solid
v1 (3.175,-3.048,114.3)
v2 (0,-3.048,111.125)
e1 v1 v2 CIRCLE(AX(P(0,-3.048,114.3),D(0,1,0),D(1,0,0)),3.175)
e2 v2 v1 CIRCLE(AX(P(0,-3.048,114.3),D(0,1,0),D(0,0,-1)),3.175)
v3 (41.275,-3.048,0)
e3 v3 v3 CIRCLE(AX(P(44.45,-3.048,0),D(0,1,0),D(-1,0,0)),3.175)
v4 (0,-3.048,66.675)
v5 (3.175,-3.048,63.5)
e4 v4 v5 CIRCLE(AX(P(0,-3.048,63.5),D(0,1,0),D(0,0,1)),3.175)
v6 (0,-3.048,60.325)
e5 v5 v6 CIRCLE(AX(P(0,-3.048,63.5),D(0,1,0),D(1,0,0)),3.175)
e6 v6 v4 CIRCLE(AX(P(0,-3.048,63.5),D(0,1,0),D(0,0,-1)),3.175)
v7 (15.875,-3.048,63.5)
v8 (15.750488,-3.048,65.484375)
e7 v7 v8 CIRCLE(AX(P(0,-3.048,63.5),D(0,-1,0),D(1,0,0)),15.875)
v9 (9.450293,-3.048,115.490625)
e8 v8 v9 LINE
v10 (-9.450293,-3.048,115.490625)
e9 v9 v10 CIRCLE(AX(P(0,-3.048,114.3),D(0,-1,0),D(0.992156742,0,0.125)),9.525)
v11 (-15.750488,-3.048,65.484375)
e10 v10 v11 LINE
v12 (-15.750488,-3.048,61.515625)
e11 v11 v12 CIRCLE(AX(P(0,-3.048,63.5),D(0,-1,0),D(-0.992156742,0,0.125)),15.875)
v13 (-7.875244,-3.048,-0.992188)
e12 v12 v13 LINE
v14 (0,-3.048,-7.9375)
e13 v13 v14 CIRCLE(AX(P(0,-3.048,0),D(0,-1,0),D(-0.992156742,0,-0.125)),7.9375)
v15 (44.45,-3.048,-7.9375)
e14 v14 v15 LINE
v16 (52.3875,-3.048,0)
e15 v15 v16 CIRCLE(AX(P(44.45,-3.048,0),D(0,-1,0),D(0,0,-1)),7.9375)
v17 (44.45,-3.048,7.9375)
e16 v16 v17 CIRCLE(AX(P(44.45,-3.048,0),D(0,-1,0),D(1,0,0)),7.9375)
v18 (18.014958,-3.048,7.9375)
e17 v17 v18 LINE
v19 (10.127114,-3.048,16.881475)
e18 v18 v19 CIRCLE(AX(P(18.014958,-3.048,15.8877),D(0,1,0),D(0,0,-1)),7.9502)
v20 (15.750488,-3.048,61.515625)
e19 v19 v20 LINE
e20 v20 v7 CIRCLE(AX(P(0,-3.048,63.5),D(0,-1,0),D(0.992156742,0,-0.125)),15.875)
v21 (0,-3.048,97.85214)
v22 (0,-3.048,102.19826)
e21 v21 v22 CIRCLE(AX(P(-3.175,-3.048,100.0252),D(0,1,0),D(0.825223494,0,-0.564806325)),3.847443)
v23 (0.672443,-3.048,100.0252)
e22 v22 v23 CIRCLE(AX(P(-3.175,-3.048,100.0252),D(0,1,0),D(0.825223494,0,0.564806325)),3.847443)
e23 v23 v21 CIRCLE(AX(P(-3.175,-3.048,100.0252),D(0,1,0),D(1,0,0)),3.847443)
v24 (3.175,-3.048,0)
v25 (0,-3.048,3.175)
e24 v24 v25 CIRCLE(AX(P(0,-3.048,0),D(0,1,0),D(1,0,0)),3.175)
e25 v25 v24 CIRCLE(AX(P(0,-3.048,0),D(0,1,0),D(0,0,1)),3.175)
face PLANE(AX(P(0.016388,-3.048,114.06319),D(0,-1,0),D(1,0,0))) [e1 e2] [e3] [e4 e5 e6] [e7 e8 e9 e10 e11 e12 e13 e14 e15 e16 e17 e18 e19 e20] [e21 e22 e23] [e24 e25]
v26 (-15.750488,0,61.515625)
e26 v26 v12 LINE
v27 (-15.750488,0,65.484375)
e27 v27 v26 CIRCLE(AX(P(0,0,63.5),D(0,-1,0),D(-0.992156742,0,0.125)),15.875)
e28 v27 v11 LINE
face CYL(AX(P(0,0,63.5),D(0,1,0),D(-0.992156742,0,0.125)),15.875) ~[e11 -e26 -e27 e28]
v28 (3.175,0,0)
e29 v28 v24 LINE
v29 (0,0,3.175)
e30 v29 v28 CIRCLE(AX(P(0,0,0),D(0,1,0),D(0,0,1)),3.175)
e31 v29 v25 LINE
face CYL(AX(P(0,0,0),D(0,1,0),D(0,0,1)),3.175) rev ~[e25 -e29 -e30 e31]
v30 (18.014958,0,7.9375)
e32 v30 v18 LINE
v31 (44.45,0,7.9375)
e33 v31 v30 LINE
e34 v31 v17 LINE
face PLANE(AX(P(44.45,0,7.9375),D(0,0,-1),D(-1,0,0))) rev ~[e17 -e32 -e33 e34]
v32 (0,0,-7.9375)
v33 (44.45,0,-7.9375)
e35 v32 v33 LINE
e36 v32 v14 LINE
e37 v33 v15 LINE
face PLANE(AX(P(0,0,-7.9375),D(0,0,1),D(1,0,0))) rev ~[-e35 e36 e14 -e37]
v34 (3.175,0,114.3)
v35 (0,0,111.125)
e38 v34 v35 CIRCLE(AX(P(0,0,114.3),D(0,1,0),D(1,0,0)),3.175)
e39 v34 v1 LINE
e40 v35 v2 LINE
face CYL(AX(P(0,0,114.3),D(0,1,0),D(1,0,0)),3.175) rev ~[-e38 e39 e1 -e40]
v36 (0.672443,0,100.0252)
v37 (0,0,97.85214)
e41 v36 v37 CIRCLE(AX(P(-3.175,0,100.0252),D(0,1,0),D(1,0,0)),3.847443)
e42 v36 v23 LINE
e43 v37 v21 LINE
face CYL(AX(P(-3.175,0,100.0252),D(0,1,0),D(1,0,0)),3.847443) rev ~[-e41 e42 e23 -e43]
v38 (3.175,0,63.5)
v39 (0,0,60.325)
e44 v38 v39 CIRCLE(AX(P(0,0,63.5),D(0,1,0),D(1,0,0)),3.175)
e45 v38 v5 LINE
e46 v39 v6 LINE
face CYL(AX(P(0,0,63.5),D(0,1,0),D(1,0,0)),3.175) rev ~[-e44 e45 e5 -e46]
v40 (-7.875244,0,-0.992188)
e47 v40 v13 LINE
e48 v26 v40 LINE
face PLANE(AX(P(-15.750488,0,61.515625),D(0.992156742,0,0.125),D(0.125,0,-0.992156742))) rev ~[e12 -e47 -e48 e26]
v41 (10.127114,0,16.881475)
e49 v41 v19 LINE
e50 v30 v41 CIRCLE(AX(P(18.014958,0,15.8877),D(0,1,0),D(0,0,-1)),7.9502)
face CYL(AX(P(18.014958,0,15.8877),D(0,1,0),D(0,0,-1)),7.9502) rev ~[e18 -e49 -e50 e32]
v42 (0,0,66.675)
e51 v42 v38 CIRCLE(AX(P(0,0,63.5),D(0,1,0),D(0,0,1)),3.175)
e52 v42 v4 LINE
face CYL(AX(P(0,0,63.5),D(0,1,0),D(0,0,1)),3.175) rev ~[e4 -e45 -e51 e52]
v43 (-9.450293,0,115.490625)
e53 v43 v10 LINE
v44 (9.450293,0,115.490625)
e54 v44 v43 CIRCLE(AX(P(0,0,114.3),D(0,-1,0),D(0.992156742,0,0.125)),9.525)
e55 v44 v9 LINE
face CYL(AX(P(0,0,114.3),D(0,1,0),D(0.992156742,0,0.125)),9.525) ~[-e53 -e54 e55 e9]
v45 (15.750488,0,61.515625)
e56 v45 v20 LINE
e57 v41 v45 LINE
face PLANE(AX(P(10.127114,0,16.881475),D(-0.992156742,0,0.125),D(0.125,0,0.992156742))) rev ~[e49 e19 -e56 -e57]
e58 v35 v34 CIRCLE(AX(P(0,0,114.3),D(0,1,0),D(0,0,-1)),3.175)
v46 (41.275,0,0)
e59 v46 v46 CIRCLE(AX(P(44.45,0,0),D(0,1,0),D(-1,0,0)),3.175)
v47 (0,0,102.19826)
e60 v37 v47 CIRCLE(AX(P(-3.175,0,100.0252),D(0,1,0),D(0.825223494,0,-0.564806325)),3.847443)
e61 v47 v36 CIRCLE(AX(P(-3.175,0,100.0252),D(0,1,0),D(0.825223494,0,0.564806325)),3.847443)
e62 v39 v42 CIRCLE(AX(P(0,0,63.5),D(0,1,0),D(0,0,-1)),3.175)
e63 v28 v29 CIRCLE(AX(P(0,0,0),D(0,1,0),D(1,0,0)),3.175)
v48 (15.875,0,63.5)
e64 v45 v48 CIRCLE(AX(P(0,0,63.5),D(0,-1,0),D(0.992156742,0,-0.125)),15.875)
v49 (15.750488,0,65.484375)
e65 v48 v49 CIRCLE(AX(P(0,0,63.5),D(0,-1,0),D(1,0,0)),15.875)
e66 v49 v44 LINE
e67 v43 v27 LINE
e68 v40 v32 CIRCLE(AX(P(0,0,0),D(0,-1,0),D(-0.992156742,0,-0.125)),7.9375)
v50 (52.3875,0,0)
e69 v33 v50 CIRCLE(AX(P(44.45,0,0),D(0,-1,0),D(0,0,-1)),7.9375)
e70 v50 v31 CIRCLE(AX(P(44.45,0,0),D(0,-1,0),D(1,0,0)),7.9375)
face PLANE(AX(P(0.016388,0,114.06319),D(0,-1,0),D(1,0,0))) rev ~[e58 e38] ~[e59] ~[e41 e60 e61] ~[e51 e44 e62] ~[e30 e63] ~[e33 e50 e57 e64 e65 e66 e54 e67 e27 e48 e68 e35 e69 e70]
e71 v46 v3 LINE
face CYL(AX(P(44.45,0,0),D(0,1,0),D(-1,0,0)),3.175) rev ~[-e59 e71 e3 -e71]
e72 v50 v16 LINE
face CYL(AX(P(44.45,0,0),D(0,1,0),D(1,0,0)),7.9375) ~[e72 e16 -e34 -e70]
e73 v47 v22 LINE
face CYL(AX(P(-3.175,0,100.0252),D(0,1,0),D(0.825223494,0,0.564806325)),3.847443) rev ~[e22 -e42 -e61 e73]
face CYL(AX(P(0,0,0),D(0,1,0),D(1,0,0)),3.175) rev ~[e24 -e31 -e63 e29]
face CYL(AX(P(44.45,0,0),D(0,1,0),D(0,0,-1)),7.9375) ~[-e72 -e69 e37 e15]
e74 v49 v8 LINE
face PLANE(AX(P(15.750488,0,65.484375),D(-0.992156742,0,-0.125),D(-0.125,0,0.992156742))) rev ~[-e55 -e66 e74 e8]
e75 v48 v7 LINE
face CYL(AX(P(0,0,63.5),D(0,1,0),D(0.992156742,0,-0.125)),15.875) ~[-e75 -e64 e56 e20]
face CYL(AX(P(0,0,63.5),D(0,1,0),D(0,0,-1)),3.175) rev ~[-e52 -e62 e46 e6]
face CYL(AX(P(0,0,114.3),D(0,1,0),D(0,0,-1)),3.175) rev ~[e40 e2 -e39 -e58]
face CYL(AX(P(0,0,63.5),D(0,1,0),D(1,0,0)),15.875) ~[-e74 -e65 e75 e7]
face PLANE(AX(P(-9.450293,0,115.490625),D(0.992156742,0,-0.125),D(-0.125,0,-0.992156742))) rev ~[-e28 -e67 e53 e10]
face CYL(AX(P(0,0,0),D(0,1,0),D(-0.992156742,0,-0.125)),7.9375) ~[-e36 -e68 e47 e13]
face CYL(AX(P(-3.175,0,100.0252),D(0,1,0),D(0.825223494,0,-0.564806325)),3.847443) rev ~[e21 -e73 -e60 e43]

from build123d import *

# Parameters (mm, degrees)
F1_DEPTH = 3.048


with BuildPart() as f1:
    # F0 (on Front) → F1 (new body)
    with BuildSketch(Plane.XZ):
        with BuildLine():
            ThreePointArc((9.4502929642, 115.490625), (0, 123.825), (-9.4502929642, 115.490625))
            ThreePointArc((-9.4502929642, 115.490625), (-7.14375, 107.9998046905), (0, 104.775))
            ThreePointArc((0, 104.775), (6.7351920908, 107.5648079092), (9.525, 114.3))
            ThreePointArc((9.525, 114.3), (9.5063048942, 114.896483242), (9.4502929642, 115.490625))
        make_face()
        with BuildLine():
            ThreePointArc((3.175, 114.3), (2.2450640303, 112.0549359697), (0, 111.125))
            ThreePointArc((0, 111.125), (-2.2450640303, 116.5450640303), (3.175, 114.3))
        make_face(mode=Mode.SUBTRACT)
        with BuildLine():
            Line((-9.4502929642, 115.490625), (-15.7504882737, 65.484375))
            ThreePointArc((-15.7504882737, 65.484375), (-10.5003255158, 75.40625), (0, 79.375))
            Line((0, 79.375), (0, 97.8521401046))
            ThreePointArc((0, 97.8521401046), (-7.0224425673, 100.0252), (0, 102.1982598954))
            Line((0, 102.1982598954), (0, 104.775))
            ThreePointArc((0, 104.775), (-7.14375, 107.9998046905), (-9.4502929642, 115.490625))
        make_face()
        with BuildLine():
            Line((0, 97.8521401046), (0, 79.375))
            ThreePointArc((0, 79.375), (10.5003255158, 75.40625), (15.7504882737, 65.484375))
            Line((15.7504882737, 65.484375), (9.4502929642, 115.490625))
            ThreePointArc((9.4502929642, 115.490625), (9.5063048942, 114.896483242), (9.525, 114.3))
            ThreePointArc((9.525, 114.3), (6.7351920908, 107.5648079092), (0, 104.775))
            Line((0, 104.775), (0, 102.1982598954))
            ThreePointArc((0, 102.1982598954), (0.5004893865, 101.1625618944), (0.6724425673, 100.0252))
            ThreePointArc((0.6724425673, 100.0252), (0.5004893865, 98.8878381056), (0, 97.8521401046))
        make_face()
        with BuildLine():
            Line((0, 47.625), (0, 7.9375))
            ThreePointArc((0, 7.9375), (5.6126600757, 5.6126600757), (7.9375, 0))
            Line((7.9375, 0), (36.5125, 0))
            ThreePointArc((36.5125, 0), (38.8373399243, 5.6126600757), (44.45, 7.9375))
            Line((44.45, 7.9375), (18.0149584735, 7.9375))
            ThreePointArc((18.0149584735, 7.9375), (12.0523084735, 10.6291369817), (10.127113946, 16.881475))
            Line((10.127113946, 16.881475), (15.7504882737, 61.515625))
            ThreePointArc((15.7504882737, 61.515625), (10.5003255158, 51.59375), (0, 47.625))
        make_face()
        with BuildLine():
            Line((0, 60.325), (0, 47.625))
            ThreePointArc((0, 47.625), (10.5003255158, 51.59375), (15.7504882737, 61.515625))
            ThreePointArc((15.7504882737, 61.515625), (15.8438414904, 62.5058612634), (15.875, 63.5))
            ThreePointArc((15.875, 63.5), (15.8438414904, 64.4941387366), (15.7504882737, 65.484375))
            ThreePointArc((15.7504882737, 65.484375), (10.5003255158, 75.40625), (0, 79.375))
            Line((0, 79.375), (0, 66.675))
            ThreePointArc((0, 66.675), (2.2450640303, 65.7450640303), (3.175, 63.5))
            ThreePointArc((3.175, 63.5), (2.2450640303, 61.2549359697), (0, 60.325))
        make_face()
        with BuildLine():
            ThreePointArc((-15.7504882737, 61.515625), (-10.5003255158, 51.59375), (0, 47.625))
            Line((0, 47.625), (0, 60.325))
            ThreePointArc((0, 60.325), (-3.175, 63.5), (0, 66.675))
            Line((0, 66.675), (0, 79.375))
            ThreePointArc((0, 79.375), (-10.5003255158, 75.40625), (-15.7504882737, 65.484375))
            ThreePointArc((-15.7504882737, 65.484375), (-15.875, 63.5), (-15.7504882737, 61.515625))
        make_face()
        with BuildLine():
            ThreePointArc((-7.8752441368, -0.9921875), (-5.953125, 5.2501627579), (0, 7.9375))
            Line((0, 7.9375), (0, 47.625))
            ThreePointArc((0, 47.625), (-10.5003255158, 51.59375), (-15.7504882737, 61.515625))
            Line((-15.7504882737, 61.515625), (-7.8752441368, -0.9921875))
        make_face()
        with BuildLine():
            Line((36.5125, 0), (7.9375, 0))
            ThreePointArc((7.9375, 0), (5.6126600757, -5.6126600757), (0, -7.9375))
            Line((0, -7.9375), (44.45, -7.9375))
            ThreePointArc((44.45, -7.9375), (38.8373399243, -5.6126600757), (36.5125, 0))
        make_face()
        with BuildLine():
            ThreePointArc((44.45, 7.9375), (38.8373399243, 5.6126600757), (36.5125, 0))
            ThreePointArc((36.5125, 0), (38.8373399243, -5.6126600757), (44.45, -7.9375))
            ThreePointArc((44.45, -7.9375), (50.0626600757, -5.6126600757), (52.3875, 0))
            ThreePointArc((52.3875, 0), (50.0626600757, 5.6126600757), (44.45, 7.9375))
        make_face()
        with BuildLine():
            ThreePointArc((47.625, 0), (44.45, -3.175), (41.275, 0))
            ThreePointArc((41.275, 0), (44.45, 3.175), (47.625, 0))
        make_face(mode=Mode.SUBTRACT)
        with BuildLine():
            ThreePointArc((3.175, 0), (-2.2450640303, -2.2450640303), (0, 3.175))
            Line((0, 3.175), (0, 7.9375))
            ThreePointArc((0, 7.9375), (-5.953125, 5.2501627579), (-7.8752441368, -0.9921875))
            ThreePointArc((-7.8752441368, -0.9921875), (-5.2501627579, -5.953125), (0, -7.9375))
            ThreePointArc((0, -7.9375), (5.6126600757, -5.6126600757), (7.9375, 0))
            Line((7.9375, 0), (3.175, 0))
        make_face()
        with BuildLine():
            Line((0, 7.9375), (0, 3.175))
            ThreePointArc((0, 3.175), (2.2450640303, 2.2450640303), (3.175, 0))
            Line((3.175, 0), (7.9375, 0))
            ThreePointArc((7.9375, 0), (5.6126600757, 5.6126600757), (0, 7.9375))
        make_face()
    extrude(amount=F1_DEPTH)


solid = f1.part
